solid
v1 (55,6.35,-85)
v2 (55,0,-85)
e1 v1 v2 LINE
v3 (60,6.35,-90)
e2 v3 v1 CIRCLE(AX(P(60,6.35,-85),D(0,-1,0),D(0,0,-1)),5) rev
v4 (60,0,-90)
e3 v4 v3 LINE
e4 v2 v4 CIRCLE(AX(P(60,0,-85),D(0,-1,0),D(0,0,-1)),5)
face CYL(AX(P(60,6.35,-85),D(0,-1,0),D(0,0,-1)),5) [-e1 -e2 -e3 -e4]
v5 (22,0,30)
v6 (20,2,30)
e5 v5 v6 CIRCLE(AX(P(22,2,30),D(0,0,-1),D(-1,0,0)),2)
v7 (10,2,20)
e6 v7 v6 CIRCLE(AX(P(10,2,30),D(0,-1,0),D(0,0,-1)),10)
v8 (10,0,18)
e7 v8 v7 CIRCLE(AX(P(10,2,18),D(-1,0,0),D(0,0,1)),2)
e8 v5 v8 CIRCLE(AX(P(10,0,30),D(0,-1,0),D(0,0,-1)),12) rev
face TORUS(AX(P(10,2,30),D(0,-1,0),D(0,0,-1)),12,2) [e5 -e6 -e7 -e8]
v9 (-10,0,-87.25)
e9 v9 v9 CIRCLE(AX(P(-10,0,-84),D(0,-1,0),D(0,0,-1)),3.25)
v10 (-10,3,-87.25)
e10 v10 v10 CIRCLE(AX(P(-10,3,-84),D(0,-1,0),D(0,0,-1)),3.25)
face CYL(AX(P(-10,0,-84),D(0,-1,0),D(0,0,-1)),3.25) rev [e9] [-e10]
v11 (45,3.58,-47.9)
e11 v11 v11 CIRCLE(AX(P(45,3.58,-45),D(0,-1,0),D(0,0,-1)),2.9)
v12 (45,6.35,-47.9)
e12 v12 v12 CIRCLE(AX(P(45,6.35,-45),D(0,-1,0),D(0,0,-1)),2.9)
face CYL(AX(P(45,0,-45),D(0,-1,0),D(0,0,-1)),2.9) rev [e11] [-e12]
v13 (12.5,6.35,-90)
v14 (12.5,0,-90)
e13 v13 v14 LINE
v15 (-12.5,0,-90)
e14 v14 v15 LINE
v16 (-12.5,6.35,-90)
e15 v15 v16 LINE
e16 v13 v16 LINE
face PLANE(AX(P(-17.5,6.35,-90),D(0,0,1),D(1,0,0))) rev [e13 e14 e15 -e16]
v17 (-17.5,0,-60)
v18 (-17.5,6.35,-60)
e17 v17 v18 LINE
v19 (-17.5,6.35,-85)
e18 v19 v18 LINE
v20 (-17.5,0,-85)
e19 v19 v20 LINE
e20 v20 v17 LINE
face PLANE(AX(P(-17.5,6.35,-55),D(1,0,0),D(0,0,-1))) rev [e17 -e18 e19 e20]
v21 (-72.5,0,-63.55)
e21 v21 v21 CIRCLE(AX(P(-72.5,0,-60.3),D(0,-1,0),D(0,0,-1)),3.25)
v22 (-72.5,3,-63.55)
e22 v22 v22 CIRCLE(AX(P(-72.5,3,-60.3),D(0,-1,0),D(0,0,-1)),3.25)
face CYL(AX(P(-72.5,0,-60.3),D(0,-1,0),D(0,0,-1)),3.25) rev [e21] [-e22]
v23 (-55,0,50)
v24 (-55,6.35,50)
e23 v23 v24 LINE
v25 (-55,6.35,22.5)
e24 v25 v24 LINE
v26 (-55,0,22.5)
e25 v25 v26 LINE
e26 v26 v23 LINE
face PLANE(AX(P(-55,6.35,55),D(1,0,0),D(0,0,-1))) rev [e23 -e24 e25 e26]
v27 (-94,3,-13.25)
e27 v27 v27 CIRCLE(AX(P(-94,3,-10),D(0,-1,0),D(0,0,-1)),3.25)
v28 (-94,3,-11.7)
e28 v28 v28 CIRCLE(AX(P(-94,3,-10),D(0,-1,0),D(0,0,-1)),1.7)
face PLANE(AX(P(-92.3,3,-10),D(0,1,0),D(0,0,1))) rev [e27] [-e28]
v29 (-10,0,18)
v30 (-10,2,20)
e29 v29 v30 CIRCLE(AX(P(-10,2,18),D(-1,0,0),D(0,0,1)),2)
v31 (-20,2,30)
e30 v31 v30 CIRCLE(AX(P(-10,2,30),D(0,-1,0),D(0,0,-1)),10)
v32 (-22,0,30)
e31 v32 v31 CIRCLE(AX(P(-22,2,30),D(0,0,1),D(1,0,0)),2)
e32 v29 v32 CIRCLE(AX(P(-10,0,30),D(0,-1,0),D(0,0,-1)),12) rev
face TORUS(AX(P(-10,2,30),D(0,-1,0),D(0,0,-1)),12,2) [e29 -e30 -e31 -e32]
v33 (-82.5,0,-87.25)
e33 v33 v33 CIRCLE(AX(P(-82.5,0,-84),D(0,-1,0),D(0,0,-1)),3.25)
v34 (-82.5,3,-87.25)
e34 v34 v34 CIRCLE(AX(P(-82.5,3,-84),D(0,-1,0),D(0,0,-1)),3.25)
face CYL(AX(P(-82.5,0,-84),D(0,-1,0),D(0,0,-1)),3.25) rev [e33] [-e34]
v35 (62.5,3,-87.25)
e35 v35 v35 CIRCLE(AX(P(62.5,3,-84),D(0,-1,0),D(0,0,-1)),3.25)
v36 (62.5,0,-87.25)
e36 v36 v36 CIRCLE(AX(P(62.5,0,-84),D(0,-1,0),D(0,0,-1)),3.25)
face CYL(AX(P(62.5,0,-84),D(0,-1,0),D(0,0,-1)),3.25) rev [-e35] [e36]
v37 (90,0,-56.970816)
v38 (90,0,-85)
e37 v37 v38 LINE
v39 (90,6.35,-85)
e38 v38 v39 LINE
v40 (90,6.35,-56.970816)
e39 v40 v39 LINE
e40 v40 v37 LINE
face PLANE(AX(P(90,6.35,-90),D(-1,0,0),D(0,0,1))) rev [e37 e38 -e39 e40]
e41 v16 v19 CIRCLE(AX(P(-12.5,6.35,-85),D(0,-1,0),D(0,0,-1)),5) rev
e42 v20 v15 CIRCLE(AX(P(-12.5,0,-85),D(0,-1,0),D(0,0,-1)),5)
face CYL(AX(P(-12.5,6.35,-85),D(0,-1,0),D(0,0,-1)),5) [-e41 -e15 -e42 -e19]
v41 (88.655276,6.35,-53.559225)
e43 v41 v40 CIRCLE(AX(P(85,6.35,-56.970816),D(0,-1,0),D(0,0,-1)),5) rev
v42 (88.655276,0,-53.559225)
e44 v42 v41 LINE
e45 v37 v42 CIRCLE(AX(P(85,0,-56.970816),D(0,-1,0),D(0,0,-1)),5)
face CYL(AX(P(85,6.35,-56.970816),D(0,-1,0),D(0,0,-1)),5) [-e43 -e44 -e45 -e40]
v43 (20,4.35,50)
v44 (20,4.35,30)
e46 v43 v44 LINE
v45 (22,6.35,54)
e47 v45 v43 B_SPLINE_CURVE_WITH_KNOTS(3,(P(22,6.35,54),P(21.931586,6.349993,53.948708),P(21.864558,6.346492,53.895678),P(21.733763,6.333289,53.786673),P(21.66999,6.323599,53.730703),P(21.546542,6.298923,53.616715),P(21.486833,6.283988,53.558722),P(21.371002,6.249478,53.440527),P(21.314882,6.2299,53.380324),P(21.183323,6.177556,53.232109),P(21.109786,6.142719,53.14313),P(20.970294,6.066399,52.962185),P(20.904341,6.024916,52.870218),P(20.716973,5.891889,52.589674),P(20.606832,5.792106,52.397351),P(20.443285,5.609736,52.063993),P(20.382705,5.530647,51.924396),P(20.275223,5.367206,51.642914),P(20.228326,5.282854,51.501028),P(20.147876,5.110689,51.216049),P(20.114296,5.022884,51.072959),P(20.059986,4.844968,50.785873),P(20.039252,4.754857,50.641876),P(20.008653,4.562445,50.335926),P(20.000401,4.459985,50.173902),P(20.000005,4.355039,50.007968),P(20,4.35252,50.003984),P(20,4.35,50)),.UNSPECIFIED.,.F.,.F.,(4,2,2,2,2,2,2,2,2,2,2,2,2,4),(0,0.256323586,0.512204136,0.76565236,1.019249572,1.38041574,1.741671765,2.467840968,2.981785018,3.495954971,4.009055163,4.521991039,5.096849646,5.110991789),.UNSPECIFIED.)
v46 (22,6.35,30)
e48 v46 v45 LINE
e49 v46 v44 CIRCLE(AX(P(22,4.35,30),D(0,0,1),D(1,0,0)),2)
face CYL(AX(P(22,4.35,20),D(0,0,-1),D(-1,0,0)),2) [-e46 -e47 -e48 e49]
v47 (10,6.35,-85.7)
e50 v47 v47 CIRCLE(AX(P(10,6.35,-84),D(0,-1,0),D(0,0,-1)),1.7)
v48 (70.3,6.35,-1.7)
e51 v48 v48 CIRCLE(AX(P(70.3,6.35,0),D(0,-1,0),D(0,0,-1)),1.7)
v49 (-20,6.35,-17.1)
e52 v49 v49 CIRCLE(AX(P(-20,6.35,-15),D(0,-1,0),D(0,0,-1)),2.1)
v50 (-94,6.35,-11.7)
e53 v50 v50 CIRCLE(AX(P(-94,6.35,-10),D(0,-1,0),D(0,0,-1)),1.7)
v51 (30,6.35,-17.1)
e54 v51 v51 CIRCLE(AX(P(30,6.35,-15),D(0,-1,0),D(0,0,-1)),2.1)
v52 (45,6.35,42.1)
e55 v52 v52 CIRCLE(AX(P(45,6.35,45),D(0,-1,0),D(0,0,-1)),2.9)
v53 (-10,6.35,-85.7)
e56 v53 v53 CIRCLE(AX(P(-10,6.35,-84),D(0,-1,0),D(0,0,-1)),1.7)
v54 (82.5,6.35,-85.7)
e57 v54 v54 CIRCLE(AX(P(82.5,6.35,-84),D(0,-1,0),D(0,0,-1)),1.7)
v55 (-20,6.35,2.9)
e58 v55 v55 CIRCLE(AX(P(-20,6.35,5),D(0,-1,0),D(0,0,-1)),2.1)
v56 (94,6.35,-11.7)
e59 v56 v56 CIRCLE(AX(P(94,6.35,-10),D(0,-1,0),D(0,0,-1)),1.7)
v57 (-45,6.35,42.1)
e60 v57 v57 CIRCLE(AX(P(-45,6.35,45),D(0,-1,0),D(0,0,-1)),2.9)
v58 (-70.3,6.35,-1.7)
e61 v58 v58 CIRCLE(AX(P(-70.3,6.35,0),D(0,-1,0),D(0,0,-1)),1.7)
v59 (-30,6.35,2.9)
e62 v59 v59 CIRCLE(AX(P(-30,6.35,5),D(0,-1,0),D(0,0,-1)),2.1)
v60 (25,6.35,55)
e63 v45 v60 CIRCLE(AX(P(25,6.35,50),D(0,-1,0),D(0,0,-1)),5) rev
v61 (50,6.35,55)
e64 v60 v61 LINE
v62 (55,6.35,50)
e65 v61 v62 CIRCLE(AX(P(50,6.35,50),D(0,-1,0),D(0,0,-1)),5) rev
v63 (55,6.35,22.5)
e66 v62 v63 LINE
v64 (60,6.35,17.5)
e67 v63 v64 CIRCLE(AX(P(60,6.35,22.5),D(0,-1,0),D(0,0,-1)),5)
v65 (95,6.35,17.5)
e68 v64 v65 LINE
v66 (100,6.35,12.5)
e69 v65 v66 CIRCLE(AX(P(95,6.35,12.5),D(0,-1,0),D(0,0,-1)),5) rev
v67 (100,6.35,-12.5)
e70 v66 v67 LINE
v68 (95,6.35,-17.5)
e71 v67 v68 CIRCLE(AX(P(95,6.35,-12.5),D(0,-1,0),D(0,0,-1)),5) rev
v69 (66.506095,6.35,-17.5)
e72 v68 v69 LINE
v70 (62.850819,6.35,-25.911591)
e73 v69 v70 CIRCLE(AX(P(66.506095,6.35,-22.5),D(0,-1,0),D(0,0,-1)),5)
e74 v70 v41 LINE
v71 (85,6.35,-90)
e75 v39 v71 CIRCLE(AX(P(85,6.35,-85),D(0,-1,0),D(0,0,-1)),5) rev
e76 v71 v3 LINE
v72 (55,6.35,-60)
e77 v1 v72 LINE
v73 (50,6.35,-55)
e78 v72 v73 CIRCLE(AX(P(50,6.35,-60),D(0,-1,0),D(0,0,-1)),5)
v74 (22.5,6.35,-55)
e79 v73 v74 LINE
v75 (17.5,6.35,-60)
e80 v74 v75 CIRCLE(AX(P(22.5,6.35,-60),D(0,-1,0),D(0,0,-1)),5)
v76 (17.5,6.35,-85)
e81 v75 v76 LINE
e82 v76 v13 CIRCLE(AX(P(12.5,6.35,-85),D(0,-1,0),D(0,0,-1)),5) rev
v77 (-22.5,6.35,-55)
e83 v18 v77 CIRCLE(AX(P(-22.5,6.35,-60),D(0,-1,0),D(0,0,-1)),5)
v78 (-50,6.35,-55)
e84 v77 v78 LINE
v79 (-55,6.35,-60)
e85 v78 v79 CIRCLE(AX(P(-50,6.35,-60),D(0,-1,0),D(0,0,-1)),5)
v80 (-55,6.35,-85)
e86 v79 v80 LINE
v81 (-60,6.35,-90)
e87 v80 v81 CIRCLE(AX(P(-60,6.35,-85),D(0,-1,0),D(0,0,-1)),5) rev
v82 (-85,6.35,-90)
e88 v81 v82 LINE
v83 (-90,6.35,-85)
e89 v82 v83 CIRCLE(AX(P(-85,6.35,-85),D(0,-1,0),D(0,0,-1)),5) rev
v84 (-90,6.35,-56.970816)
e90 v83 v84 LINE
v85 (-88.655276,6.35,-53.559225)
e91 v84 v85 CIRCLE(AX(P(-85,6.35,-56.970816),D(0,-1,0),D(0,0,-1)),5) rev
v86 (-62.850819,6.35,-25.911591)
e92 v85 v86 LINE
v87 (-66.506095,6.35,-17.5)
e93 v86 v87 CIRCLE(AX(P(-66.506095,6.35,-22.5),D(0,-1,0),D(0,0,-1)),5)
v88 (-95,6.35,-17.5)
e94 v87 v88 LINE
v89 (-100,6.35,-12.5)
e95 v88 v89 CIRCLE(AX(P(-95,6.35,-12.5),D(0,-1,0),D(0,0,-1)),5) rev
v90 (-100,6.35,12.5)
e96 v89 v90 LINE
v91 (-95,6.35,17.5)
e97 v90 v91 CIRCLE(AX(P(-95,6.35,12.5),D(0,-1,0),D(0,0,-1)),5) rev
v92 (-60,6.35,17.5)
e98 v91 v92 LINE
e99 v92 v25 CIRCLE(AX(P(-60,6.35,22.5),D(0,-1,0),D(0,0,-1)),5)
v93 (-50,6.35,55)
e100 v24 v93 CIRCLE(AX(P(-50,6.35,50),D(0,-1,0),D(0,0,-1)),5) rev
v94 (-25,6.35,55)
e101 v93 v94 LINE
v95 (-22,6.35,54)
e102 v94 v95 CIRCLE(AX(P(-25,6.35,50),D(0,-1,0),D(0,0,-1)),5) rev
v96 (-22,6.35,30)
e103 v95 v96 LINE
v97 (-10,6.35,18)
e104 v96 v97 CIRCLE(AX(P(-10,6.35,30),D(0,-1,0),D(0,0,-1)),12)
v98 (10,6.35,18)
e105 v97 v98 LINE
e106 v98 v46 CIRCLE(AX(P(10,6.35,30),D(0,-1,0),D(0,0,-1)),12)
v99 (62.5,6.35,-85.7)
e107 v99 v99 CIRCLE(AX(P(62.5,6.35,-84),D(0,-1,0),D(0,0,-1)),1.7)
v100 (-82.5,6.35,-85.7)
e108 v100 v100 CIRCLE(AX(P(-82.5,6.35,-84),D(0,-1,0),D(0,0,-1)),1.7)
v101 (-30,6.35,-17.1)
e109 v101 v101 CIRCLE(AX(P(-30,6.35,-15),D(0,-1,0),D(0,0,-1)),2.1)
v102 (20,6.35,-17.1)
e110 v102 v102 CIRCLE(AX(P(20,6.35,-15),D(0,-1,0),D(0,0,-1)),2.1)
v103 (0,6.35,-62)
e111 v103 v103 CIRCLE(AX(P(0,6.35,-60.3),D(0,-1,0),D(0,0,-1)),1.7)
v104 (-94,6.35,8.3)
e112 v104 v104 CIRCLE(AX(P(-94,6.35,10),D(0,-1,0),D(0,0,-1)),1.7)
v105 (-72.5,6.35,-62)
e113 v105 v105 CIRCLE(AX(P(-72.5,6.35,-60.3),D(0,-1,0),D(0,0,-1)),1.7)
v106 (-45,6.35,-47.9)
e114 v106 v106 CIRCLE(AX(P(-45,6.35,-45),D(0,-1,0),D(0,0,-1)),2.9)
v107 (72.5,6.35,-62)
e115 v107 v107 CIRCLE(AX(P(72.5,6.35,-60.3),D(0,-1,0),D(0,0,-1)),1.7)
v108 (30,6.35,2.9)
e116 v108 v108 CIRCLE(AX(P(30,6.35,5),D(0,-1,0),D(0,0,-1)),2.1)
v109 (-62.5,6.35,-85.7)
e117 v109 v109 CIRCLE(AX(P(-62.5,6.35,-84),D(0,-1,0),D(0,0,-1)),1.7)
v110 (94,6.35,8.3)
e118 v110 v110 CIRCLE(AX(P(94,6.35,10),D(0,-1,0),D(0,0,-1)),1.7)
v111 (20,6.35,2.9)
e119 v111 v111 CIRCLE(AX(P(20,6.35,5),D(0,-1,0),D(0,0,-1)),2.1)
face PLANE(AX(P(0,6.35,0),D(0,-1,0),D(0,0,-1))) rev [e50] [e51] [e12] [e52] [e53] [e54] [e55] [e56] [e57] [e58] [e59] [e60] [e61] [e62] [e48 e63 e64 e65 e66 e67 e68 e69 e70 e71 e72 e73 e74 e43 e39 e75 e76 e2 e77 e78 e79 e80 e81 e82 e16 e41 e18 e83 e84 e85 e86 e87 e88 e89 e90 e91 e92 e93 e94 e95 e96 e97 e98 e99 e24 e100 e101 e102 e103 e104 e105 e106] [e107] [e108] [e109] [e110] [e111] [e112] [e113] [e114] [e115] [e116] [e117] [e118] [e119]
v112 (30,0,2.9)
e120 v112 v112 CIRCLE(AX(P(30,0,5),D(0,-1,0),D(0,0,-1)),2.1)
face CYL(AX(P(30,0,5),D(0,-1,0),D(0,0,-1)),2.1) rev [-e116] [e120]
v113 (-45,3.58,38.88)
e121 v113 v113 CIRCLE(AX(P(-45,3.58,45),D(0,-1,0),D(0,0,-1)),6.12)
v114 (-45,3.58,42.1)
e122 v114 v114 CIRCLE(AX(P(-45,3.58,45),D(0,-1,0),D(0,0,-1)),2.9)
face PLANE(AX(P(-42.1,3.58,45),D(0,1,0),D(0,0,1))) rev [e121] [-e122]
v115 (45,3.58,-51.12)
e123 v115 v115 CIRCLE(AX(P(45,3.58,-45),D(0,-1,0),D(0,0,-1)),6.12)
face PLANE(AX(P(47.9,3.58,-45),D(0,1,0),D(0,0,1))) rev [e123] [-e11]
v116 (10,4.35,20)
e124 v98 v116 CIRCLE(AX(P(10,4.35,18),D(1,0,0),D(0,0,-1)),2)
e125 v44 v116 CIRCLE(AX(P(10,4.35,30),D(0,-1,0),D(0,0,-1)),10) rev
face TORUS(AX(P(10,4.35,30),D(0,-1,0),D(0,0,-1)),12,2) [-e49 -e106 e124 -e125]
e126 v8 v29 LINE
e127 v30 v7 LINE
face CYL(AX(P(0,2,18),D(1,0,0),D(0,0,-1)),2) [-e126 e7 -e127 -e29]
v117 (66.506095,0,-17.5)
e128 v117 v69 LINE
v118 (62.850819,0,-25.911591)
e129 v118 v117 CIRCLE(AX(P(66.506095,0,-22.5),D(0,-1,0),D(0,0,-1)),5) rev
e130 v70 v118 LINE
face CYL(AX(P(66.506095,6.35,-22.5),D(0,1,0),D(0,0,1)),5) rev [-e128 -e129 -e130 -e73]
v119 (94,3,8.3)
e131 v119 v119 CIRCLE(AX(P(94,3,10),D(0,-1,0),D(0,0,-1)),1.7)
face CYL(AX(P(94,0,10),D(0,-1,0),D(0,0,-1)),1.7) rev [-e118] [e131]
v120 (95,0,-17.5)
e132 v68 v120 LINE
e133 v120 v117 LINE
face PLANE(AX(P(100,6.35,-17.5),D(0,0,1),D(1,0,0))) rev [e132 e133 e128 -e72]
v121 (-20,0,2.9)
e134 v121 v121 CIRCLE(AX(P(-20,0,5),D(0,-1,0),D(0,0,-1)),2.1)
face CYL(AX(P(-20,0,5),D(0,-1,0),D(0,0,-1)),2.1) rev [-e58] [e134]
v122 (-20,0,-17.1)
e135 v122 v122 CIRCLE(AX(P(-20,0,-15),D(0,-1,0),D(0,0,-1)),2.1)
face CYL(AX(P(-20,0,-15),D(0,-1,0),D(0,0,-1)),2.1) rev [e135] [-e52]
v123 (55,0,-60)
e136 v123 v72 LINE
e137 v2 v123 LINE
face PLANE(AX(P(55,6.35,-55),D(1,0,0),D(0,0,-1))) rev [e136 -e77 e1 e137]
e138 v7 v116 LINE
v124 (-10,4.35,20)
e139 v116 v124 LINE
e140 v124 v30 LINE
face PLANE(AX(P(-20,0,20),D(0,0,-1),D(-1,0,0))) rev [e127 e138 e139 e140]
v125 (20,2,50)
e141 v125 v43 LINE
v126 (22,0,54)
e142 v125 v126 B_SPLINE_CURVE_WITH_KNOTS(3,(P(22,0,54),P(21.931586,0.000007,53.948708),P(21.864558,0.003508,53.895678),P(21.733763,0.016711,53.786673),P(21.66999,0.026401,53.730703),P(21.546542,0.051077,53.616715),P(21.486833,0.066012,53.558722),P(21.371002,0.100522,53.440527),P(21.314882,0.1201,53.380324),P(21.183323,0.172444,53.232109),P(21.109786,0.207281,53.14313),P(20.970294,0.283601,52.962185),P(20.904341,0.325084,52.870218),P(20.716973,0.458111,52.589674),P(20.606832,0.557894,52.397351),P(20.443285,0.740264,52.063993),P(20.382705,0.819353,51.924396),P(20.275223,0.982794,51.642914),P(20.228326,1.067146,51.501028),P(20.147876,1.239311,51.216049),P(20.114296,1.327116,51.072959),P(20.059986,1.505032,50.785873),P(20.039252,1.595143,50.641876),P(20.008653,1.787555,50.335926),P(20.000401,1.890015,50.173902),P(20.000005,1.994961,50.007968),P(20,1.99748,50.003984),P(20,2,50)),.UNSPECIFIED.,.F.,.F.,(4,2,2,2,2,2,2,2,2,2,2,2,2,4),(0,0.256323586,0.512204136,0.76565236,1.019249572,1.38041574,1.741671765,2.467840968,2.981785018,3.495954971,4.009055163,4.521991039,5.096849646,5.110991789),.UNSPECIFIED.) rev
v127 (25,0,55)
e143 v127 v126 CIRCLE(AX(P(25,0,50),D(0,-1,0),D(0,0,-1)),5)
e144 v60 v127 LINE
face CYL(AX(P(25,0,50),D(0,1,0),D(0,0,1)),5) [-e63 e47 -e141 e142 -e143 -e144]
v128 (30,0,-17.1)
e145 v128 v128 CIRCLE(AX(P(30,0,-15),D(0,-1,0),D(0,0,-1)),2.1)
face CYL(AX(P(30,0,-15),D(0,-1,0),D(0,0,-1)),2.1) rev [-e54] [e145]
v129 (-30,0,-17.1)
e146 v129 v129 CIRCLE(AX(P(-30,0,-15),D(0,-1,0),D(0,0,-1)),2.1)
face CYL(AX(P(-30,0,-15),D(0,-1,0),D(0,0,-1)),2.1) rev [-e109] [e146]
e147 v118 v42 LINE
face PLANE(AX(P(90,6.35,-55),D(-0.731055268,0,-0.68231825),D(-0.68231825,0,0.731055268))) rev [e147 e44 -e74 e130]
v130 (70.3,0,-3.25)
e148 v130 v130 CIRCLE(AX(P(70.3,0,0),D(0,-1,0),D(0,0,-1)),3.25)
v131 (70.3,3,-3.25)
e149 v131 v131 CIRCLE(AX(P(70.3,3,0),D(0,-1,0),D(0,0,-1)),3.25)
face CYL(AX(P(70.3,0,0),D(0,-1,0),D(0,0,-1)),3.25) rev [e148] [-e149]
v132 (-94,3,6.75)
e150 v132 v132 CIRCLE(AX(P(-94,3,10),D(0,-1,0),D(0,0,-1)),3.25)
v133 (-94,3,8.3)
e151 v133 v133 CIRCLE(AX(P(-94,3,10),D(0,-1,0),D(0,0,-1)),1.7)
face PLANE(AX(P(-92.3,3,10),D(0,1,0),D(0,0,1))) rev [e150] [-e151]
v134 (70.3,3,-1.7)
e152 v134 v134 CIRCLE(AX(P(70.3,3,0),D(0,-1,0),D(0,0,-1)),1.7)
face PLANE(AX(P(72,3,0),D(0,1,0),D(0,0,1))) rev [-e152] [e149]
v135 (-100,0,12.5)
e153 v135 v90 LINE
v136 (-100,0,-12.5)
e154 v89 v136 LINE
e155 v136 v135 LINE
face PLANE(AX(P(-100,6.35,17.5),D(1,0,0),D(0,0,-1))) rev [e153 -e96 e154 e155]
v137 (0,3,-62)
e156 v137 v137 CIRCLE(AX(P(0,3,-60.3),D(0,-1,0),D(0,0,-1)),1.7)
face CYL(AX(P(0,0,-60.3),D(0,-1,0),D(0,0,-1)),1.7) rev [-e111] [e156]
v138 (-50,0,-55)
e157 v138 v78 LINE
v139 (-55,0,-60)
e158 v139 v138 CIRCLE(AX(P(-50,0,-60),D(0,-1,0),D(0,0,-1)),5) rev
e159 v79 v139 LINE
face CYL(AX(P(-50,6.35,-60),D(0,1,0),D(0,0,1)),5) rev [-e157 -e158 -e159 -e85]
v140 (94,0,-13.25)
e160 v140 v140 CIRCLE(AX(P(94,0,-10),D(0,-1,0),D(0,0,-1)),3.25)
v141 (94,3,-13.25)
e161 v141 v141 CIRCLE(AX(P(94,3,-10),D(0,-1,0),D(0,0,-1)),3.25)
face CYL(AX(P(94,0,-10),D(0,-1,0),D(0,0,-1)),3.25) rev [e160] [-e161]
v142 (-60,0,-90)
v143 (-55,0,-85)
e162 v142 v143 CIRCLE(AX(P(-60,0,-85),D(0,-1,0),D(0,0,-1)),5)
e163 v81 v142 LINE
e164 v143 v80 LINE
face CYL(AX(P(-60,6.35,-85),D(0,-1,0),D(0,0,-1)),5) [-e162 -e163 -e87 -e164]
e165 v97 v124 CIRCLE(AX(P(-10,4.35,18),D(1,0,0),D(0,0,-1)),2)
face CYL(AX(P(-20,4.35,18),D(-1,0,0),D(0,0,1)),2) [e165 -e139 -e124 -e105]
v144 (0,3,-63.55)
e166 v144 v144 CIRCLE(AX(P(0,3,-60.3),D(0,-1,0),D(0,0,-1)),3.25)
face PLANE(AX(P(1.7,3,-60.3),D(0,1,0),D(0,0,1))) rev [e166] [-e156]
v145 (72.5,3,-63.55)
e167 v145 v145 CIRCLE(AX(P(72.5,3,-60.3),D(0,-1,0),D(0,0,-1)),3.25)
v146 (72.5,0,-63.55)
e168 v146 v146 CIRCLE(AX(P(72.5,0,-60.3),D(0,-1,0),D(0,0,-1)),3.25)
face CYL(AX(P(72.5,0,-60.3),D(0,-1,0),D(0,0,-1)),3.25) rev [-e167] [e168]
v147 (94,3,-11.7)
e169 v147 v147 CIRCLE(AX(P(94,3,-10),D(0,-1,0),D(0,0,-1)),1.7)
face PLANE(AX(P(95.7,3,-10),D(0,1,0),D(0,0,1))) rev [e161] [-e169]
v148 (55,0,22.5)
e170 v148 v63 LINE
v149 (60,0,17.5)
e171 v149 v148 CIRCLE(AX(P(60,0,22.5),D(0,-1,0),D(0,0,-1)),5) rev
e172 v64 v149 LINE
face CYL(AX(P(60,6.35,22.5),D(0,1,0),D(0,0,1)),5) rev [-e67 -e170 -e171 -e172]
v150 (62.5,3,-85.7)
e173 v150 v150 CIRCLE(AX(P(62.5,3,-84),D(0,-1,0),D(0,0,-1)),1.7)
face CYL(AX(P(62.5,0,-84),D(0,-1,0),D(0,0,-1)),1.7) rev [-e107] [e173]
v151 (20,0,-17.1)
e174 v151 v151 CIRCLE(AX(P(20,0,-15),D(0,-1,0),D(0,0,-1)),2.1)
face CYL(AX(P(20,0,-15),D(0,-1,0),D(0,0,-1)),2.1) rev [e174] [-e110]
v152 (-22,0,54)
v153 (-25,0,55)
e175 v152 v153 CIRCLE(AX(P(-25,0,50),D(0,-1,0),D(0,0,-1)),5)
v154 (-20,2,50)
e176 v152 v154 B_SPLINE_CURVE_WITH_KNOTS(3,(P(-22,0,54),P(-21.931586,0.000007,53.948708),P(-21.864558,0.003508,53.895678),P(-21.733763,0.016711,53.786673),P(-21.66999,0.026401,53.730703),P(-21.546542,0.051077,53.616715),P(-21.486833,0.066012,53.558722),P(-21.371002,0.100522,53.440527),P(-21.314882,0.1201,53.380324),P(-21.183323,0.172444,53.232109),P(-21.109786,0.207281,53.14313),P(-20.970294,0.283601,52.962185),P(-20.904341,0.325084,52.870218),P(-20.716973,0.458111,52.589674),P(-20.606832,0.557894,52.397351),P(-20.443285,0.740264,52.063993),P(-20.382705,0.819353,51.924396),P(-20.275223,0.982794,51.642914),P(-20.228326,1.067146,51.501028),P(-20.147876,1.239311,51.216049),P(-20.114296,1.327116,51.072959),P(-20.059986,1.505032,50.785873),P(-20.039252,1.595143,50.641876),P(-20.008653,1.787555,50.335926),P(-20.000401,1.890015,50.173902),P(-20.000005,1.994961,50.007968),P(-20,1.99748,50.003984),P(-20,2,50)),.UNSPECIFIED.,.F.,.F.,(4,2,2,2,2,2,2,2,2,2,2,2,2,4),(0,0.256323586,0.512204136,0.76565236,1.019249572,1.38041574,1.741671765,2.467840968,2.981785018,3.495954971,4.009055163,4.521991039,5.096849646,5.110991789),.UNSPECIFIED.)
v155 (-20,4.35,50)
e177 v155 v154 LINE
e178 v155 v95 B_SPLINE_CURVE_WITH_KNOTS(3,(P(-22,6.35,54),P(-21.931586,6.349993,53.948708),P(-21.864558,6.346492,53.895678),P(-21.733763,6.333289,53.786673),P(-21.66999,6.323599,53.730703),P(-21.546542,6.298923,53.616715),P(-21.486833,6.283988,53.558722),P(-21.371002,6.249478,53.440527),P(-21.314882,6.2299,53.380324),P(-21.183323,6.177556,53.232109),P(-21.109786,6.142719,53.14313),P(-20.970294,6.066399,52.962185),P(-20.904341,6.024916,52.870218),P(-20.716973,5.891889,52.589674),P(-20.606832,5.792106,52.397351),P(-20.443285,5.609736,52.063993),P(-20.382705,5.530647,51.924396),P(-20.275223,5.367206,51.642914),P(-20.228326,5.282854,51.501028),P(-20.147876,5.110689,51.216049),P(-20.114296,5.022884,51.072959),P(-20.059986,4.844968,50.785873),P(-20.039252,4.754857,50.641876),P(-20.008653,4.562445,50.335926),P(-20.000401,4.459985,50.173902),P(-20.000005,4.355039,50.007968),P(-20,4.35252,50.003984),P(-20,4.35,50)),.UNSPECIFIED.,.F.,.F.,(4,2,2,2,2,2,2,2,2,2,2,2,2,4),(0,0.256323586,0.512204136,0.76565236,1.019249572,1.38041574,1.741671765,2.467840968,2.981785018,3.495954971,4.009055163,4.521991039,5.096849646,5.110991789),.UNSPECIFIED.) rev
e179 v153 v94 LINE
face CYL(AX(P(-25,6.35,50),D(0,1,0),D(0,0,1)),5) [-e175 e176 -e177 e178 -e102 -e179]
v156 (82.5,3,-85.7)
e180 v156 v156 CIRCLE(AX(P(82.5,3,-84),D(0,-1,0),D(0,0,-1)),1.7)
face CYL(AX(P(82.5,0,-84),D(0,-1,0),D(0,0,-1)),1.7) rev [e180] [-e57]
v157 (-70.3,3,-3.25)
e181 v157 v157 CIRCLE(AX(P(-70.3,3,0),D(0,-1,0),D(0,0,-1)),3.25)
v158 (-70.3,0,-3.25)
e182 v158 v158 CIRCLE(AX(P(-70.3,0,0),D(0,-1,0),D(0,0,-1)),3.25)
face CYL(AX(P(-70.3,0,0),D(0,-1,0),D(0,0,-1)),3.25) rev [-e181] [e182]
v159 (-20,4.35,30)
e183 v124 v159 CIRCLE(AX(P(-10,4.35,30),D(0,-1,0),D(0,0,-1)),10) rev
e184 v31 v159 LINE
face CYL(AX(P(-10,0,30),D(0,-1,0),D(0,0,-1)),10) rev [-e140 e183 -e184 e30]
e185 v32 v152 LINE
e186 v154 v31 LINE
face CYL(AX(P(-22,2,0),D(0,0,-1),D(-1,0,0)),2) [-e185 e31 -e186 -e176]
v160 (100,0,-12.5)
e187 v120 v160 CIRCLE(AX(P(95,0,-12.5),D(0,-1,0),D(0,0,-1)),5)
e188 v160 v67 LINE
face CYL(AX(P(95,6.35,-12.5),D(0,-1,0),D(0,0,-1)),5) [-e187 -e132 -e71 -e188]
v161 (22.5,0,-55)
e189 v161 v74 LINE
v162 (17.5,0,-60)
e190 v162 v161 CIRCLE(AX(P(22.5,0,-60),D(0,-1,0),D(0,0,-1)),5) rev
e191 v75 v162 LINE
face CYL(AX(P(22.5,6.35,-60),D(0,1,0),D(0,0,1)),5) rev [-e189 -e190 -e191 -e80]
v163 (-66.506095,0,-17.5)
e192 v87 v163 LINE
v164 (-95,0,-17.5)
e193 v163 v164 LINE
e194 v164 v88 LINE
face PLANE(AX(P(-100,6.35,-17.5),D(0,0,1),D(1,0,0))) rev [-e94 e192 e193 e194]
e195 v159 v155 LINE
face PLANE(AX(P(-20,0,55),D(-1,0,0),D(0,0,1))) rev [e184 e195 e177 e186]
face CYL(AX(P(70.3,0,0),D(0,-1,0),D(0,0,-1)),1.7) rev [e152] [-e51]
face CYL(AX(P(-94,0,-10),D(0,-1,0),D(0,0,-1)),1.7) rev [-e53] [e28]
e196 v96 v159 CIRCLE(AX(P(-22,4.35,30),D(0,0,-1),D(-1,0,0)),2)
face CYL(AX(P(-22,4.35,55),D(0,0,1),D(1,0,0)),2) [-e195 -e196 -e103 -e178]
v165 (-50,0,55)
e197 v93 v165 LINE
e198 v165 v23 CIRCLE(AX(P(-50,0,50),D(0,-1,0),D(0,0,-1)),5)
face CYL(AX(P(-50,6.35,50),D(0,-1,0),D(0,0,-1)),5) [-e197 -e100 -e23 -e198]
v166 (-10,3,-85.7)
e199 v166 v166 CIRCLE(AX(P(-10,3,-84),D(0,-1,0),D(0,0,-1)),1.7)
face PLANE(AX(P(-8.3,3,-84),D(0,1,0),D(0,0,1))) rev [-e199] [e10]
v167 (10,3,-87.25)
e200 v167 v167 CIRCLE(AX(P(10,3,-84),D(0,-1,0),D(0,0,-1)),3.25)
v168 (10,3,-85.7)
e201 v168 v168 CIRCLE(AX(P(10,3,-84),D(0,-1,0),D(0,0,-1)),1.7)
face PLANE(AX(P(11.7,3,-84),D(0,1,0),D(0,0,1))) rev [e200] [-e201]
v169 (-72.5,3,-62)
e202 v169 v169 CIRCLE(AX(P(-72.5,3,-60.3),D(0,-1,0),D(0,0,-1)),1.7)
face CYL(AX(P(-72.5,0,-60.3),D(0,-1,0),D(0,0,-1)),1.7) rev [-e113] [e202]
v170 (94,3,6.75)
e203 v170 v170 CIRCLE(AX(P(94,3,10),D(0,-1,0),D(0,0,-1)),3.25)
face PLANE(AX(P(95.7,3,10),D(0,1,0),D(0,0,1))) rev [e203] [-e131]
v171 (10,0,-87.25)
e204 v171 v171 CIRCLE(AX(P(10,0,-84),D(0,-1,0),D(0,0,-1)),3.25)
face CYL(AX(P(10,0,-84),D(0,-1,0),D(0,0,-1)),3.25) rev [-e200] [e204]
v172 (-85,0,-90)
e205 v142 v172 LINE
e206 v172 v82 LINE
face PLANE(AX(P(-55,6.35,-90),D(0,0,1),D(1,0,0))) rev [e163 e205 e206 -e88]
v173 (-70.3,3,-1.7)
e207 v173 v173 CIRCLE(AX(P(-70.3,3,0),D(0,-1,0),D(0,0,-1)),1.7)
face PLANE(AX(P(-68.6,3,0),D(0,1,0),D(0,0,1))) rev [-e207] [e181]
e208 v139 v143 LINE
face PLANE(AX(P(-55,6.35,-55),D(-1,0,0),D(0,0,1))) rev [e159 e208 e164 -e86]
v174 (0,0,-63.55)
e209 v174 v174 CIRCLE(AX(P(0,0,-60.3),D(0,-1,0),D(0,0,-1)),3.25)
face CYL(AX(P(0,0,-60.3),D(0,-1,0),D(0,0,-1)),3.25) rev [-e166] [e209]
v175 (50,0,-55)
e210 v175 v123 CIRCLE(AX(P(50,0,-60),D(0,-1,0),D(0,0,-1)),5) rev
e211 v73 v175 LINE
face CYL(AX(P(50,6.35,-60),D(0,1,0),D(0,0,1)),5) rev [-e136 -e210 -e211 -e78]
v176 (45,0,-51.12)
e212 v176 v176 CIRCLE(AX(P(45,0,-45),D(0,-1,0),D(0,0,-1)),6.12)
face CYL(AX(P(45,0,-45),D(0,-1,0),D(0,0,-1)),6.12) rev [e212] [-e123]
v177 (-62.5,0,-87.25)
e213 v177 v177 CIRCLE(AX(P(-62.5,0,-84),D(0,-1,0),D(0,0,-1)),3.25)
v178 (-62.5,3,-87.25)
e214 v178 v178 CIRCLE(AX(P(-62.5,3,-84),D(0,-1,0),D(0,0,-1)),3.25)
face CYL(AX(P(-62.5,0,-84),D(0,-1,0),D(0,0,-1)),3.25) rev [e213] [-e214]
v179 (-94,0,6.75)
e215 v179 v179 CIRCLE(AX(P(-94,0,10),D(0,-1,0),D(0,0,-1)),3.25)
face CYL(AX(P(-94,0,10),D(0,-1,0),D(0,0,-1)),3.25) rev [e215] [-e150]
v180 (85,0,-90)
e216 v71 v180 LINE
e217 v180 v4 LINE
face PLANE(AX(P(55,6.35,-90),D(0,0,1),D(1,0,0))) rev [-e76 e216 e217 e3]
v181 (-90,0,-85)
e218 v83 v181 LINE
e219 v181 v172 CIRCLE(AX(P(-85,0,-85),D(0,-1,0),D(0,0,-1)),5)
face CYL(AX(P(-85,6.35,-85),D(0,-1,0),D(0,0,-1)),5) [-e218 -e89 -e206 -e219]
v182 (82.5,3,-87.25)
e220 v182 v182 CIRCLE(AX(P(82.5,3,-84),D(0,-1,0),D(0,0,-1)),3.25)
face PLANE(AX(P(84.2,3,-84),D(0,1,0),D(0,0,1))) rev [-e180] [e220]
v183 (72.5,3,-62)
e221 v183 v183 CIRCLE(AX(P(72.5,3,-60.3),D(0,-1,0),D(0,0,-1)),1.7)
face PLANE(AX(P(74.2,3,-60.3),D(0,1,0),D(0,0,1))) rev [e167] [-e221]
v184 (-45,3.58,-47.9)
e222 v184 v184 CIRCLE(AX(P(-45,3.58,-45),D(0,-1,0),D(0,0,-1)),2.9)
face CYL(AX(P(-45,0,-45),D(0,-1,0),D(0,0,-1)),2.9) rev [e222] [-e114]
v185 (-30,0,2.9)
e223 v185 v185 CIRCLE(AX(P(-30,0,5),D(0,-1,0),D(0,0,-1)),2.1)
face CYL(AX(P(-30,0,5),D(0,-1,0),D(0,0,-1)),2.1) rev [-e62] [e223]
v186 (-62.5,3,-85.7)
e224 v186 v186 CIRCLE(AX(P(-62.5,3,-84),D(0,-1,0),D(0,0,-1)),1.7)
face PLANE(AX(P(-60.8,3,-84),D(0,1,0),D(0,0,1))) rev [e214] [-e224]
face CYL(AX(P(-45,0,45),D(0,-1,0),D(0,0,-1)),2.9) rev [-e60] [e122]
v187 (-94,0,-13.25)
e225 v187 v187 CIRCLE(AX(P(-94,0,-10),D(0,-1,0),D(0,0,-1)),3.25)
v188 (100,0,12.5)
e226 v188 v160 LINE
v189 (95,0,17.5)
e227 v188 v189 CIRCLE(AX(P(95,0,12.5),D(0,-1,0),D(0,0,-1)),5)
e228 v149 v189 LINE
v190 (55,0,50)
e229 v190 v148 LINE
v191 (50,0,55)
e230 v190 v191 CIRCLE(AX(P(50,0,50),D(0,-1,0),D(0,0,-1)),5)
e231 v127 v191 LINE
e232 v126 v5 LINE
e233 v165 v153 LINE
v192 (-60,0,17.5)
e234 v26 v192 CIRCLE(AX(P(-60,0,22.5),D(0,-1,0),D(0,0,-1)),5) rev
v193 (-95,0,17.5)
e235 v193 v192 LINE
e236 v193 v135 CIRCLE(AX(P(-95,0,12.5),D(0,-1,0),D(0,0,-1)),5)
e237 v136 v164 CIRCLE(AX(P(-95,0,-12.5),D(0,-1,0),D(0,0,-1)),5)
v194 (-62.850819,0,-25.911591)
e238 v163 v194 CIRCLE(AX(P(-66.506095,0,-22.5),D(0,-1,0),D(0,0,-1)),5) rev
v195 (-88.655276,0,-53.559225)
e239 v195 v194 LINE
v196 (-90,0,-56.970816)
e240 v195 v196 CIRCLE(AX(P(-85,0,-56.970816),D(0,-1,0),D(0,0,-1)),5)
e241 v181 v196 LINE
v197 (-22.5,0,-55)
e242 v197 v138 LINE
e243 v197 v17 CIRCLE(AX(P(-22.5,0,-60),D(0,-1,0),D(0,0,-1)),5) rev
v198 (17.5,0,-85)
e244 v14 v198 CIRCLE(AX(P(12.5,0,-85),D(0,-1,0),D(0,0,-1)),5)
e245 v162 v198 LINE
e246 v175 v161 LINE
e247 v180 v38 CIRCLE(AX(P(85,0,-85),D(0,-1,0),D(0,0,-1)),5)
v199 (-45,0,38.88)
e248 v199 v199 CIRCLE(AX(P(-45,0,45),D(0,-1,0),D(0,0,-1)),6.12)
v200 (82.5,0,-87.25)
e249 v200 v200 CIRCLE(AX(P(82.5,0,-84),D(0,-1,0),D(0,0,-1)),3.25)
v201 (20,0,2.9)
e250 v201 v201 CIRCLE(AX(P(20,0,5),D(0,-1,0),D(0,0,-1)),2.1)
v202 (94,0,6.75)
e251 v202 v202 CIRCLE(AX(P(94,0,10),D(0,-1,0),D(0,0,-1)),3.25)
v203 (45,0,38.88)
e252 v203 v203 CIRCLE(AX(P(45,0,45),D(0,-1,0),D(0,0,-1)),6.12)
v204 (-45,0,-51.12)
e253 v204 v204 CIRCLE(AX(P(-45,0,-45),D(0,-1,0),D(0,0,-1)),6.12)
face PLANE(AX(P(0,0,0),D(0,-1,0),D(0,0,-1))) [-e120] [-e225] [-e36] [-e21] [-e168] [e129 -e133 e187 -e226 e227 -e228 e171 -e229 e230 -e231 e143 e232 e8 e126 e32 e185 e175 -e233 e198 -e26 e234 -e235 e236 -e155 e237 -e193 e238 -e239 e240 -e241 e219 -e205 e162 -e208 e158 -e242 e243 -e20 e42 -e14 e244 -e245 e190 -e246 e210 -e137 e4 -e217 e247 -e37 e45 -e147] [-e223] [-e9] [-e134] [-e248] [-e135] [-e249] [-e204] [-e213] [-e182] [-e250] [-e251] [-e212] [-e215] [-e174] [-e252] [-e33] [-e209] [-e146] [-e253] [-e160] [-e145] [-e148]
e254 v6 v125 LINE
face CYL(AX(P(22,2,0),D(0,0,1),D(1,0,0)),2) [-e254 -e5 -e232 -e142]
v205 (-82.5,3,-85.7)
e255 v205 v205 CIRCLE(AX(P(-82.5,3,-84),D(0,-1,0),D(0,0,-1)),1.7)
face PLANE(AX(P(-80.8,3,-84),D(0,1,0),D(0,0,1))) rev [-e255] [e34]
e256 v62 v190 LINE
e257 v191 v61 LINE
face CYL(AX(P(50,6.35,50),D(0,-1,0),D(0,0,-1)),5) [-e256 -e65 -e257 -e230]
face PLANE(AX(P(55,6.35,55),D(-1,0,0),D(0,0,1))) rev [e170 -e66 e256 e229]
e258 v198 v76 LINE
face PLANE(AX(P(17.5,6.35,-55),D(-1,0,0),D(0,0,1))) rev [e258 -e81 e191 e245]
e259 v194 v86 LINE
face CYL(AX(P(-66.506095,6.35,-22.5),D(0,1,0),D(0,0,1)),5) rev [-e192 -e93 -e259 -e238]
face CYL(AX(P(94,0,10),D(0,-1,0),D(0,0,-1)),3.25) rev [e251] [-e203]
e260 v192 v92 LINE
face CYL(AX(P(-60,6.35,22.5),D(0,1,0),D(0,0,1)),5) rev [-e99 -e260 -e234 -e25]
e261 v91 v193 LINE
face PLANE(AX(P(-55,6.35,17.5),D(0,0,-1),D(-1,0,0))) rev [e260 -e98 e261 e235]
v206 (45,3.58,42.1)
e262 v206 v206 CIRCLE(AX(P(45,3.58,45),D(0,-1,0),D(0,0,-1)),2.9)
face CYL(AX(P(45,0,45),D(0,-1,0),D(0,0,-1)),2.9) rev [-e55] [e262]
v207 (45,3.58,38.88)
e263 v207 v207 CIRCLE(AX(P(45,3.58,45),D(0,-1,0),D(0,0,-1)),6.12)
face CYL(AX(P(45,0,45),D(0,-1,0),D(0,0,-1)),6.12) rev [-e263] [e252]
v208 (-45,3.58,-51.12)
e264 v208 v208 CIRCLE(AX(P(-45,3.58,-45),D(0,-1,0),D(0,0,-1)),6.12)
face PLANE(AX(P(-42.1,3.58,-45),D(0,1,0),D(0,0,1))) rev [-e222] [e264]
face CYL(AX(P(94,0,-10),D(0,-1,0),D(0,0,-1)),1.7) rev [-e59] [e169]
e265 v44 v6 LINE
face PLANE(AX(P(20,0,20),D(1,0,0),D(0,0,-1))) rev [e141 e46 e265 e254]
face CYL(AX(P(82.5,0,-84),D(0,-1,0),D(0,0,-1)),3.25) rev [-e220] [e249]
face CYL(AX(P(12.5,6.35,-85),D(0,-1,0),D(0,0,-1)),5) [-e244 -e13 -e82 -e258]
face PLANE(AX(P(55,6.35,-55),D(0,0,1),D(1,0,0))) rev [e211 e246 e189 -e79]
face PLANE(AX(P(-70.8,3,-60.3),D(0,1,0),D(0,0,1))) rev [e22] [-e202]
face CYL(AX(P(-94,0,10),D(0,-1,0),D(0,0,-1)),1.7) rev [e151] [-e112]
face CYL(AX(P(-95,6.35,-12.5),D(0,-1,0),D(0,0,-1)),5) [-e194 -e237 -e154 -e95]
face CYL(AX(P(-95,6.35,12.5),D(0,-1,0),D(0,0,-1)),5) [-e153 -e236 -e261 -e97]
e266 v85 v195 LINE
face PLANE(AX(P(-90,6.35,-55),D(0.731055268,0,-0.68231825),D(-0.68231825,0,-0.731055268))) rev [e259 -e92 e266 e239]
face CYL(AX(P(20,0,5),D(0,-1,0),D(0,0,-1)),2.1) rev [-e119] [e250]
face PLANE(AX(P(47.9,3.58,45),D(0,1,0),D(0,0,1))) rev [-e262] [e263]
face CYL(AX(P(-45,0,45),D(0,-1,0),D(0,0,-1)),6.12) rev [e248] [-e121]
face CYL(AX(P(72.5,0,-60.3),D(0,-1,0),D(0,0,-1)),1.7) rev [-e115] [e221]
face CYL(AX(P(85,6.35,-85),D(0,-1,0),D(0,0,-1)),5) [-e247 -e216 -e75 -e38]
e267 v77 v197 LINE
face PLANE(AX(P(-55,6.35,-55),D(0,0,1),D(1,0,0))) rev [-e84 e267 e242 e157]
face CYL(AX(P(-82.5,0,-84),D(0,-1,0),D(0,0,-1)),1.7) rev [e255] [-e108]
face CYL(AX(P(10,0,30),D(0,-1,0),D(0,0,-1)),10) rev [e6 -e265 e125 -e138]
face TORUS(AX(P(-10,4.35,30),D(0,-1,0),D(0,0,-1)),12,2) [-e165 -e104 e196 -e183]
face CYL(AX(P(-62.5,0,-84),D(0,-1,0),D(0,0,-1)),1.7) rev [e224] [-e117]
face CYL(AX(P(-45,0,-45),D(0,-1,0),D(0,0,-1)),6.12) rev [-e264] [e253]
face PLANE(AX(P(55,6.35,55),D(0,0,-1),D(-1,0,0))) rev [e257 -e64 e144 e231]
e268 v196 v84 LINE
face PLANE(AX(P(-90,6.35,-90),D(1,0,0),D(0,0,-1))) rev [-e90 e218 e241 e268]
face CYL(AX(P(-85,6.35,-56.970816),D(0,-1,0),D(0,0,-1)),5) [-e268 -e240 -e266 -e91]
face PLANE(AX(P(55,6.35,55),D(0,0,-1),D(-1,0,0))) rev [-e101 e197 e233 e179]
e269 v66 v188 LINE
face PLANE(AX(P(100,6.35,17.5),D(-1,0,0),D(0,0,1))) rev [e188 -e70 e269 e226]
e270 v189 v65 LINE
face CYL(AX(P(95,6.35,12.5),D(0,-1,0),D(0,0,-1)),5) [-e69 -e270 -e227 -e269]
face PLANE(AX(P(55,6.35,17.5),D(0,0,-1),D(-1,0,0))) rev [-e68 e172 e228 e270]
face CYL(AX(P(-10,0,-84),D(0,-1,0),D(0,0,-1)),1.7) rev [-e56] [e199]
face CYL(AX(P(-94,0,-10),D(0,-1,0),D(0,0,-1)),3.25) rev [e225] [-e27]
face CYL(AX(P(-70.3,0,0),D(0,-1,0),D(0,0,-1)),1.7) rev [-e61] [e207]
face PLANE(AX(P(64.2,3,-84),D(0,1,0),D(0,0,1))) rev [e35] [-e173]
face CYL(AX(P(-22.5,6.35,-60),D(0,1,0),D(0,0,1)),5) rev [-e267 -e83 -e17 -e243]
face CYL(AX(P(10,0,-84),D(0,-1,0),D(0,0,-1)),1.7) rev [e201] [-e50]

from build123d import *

# Parameters (mm, degrees)
BOSS_EXTRUDE1_DEPTH                     = 6.35
SKETCH4_W                               = 40
SKETCH4_H                               = 35
CUT_EXTRUDE1_DEPTH                      = 135.686014493
FILLET1_R                               = 5
CBORE_FOR_M5_HEX_HEAD_BOLT1_D           = 5.8
CBORE_FOR_M5_HEX_HEAD_BOLT1_CBORE_D     = 12.24
CBORE_FOR_M5_HEX_HEAD_BOLT1_CBORE_DEPTH = 3.58
FILLET2_R                               = 10
FILLET3_R                               = 2
CBORE_FOR_M3_SHCS1_D                    = 3.4
CBORE_FOR_M3_SHCS1_CBORE_D              = 6.5
CBORE_FOR_M3_SHCS1_CBORE_DEPTH          = 3
M5X0_8_TAPPED_HOLE1_D                   = 4.2


with BuildPart() as part:
    # Sketch1 → Boss-Extrude1 (new body)
    with BuildSketch(Plane(origin=(0, 0, 0), x_dir=(1, 0, 0), z_dir=(0, 1, 0))):
        Polygon((55, -55), (-55, -55), (-55, -17.5), (-100, -17.5), (-100, 17.5), (-55, 17.5), (-90, 55), (-90, 90), (-55, 90), (-55, 55), (-17.5, 55), (-17.5, 90), (17.5, 90), (17.5, 55), (55, 55), (55, 90), (90, 90), (90, 55), (55, 17.5), (100, 17.5), (100, -17.5), (55, -17.5), align=None)
    extrude(amount=BOSS_EXTRUDE1_DEPTH)

    # Sketch4 → Cut-Extrude1 (cut, through all)
    with BuildSketch(Plane(origin=(0, 6.35, 0), x_dir=(1, 0, 0), z_dir=(0, 1, 0))):
        with Locations((0, -37.5)):
            Rectangle(SKETCH4_W, SKETCH4_H)
    extrude(amount=-CUT_EXTRUDE1_DEPTH, mode=Mode.SUBTRACT)

    # Fillet1
    fillet1_edges = [part.edges().sort_by_distance(p)[0] for p in [
        (-90, 3.175, -55),
        (-90, 3.175, -90),
        (-55, 3.175, -90),
        (-55, 3.175, -55),
        (-17.5, 3.175, -55),
        (-17.5, 3.175, -90),
        (17.5, 3.175, -90),
        (17.5, 3.175, -55),
        (55, 3.175, -55),
        (55, 3.175, -90),
        (90, 3.175, -90),
        (90, 3.175, -55),
        (55, 3.175, -17.5),
        (100, 3.175, -17.5),
        (100, 3.175, 17.5),
        (55, 3.175, 17.5),
        (55, 3.175, 55),
        (-55, 3.175, 55),
        (-55, 3.175, 17.5),
        (-100, 3.175, 17.5),
        (-100, 3.175, -17.5),
        (-55, 3.175, -17.5),
        (20, 3.175, 55),
        (-20, 3.175, 55),
    ]]
    fillet(fillet1_edges, radius=FILLET1_R)

    # CBORE for M5 Hex Head Bolt1 (through all)
    with Locations(Plane.XZ):
        with Locations((-45, 45), (-45, -45), (45, -45), (45, 45)):
            CounterBoreHole(CBORE_FOR_M5_HEX_HEAD_BOLT1_D / 2, CBORE_FOR_M5_HEX_HEAD_BOLT1_CBORE_D / 2, CBORE_FOR_M5_HEX_HEAD_BOLT1_CBORE_DEPTH)

    # Fillet2
    fillet2_edges = [part.edges().sort_by_distance(p)[0] for p in [
        (-20, 3.175, 20),
        (20, 3.175, 20),
    ]]
    fillet(fillet2_edges, radius=FILLET2_R)

    # Fillet3
    # the kernel refuses this fillet: 2 mm, written as the material it takes off along each edge
    with BuildSketch(Plane(origin=(20, 6.35, 30), x_dir=(0, -1, 0), z_dir=(0, 0, 1)), Plane(origin=(-20, 6.35, 55), x_dir=(0, -1, 0), z_dir=(0, 0, -1))) as fillet3_piece_1:
        with BuildLine():
            CenterArc((FILLET3_R, FILLET3_R), FILLET3_R, 180, 90)
            Line((0, FILLET3_R), (0, 0))
            Line((0, 0), (FILLET3_R, 0))
        make_face()
    extrude(amount=25, mode=Mode.SUBTRACT)
    with BuildSketch(Plane(origin=(-10, 6.35, 20), x_dir=(0, -1, 0), z_dir=(1, 0, 0))) as fillet3_piece_2:
        with BuildLine():
            CenterArc((FILLET3_R, FILLET3_R), FILLET3_R, 180, 90)
            Line((0, FILLET3_R), (0, 0))
            Line((0, 0), (FILLET3_R, 0))
        make_face()
    extrude(amount=20, mode=Mode.SUBTRACT)
    with BuildSketch(Plane(origin=(-20, 0, 30), x_dir=(-1, 0, 0), z_dir=(0, 0, 1)), Plane(origin=(20, 0, 55), x_dir=(1, 0, 0), z_dir=(0, 0, -1))) as fillet3_piece_3:
        with BuildLine():
            CenterArc((FILLET3_R, -FILLET3_R), FILLET3_R, 90, 90)
            Line((0, -FILLET3_R), (0, 0))
            Line((0, 0), (FILLET3_R, 0))
        make_face()
    extrude(amount=25, mode=Mode.SUBTRACT)
    with BuildSketch(Plane(origin=(10, 0, 20), x_dir=(0, 0, -1), z_dir=(-1, 0, 0))) as fillet3_piece_4:
        with BuildLine():
            CenterArc((FILLET3_R, -FILLET3_R), FILLET3_R, 90, 90)
            Line((0, -FILLET3_R), (0, 0))
            Line((0, 0), (FILLET3_R, 0))
        make_face()
    extrude(amount=20, mode=Mode.SUBTRACT)
    with BuildSketch(Plane(origin=(10, 0, 30), x_dir=(1, 0, 0), z_dir=(0, 0, 1))) as fillet3_piece_5:
        with BuildLine():
            CenterArc((10 + FILLET3_R, FILLET3_R), FILLET3_R, 180, 90)
            Line((10, FILLET3_R), (10, 0))
            Line((10, 0), (10 + FILLET3_R, 0))
        make_face()
    revolve(axis=Axis((10, 0, 30), (0, 1, 0)), revolution_arc=90, mode=Mode.SUBTRACT)
    with BuildSketch(Plane(origin=(-10, 0, 30), x_dir=(0, 0, -1), z_dir=(1, 0, 0))) as fillet3_piece_6:
        with BuildLine():
            CenterArc((10 + FILLET3_R, FILLET3_R), FILLET3_R, 180, 90)
            Line((10, FILLET3_R), (10, 0))
            Line((10, 0), (10 + FILLET3_R, 0))
        make_face()
    revolve(axis=Axis((-10, 0, 30), (0, 1, 0)), revolution_arc=90, mode=Mode.SUBTRACT)
    with BuildSketch(Plane(origin=(-10, 6.35, 30), x_dir=(0, 0, -1), z_dir=(1, 0, 0))) as fillet3_piece_7:
        with BuildLine():
            CenterArc((10 + FILLET3_R, -FILLET3_R), FILLET3_R, 90, 90)
            Line((10 + FILLET3_R, 0), (10, 0))
            Line((10, 0), (10, -FILLET3_R))
        make_face()
    revolve(axis=Axis((-10, 6.35, 30), (0, 1, 0)), revolution_arc=90, mode=Mode.SUBTRACT)
    with BuildSketch(Plane(origin=(10, 6.35, 30), x_dir=(1, 0, 0), z_dir=(0, 0, 1))) as fillet3_piece_8:
        with BuildLine():
            CenterArc((10 + FILLET3_R, -FILLET3_R), FILLET3_R, 90, 90)
            Line((10 + FILLET3_R, 0), (10, 0))
            Line((10, 0), (10, -FILLET3_R))
        make_face()
    revolve(axis=Axis((10, 6.35, 30), (0, 1, 0)), revolution_arc=90, mode=Mode.SUBTRACT)

    # CBORE for M3 SHCS1 (through all)
    with Locations(Plane(origin=(0, 0, 0), x_dir=(-1, 0, 0), z_dir=(0, -1, 0))):
        with Locations((10, 84), (-10, 84), (0, 60.3), (-94, 10), (-94, -10), (-70.3, 0), (94, -10), (94, 10), (70.3, 0), (-82.5, 84), (-62.5, 84), (-72.5, 60.3), (72.5, 60.3), (82.5, 84), (62.5, 84)):
            CounterBoreHole(CBORE_FOR_M3_SHCS1_D / 2, CBORE_FOR_M3_SHCS1_CBORE_D / 2, CBORE_FOR_M3_SHCS1_CBORE_DEPTH)

    # M5x0.8 Tapped Hole1 (through all)
    with Locations(Plane(origin=(0, 0, 0), x_dir=(-1, 0, 0), z_dir=(0, -1, 0))):
        with Locations((-20, 15), (20, 15), (20, -5), (-20, -5), (-30, 15), (-30, -5), (30, 15), (30, -5)):
            Hole(M5X0_8_TAPPED_HOLE1_D / 2)


solid = part.part
